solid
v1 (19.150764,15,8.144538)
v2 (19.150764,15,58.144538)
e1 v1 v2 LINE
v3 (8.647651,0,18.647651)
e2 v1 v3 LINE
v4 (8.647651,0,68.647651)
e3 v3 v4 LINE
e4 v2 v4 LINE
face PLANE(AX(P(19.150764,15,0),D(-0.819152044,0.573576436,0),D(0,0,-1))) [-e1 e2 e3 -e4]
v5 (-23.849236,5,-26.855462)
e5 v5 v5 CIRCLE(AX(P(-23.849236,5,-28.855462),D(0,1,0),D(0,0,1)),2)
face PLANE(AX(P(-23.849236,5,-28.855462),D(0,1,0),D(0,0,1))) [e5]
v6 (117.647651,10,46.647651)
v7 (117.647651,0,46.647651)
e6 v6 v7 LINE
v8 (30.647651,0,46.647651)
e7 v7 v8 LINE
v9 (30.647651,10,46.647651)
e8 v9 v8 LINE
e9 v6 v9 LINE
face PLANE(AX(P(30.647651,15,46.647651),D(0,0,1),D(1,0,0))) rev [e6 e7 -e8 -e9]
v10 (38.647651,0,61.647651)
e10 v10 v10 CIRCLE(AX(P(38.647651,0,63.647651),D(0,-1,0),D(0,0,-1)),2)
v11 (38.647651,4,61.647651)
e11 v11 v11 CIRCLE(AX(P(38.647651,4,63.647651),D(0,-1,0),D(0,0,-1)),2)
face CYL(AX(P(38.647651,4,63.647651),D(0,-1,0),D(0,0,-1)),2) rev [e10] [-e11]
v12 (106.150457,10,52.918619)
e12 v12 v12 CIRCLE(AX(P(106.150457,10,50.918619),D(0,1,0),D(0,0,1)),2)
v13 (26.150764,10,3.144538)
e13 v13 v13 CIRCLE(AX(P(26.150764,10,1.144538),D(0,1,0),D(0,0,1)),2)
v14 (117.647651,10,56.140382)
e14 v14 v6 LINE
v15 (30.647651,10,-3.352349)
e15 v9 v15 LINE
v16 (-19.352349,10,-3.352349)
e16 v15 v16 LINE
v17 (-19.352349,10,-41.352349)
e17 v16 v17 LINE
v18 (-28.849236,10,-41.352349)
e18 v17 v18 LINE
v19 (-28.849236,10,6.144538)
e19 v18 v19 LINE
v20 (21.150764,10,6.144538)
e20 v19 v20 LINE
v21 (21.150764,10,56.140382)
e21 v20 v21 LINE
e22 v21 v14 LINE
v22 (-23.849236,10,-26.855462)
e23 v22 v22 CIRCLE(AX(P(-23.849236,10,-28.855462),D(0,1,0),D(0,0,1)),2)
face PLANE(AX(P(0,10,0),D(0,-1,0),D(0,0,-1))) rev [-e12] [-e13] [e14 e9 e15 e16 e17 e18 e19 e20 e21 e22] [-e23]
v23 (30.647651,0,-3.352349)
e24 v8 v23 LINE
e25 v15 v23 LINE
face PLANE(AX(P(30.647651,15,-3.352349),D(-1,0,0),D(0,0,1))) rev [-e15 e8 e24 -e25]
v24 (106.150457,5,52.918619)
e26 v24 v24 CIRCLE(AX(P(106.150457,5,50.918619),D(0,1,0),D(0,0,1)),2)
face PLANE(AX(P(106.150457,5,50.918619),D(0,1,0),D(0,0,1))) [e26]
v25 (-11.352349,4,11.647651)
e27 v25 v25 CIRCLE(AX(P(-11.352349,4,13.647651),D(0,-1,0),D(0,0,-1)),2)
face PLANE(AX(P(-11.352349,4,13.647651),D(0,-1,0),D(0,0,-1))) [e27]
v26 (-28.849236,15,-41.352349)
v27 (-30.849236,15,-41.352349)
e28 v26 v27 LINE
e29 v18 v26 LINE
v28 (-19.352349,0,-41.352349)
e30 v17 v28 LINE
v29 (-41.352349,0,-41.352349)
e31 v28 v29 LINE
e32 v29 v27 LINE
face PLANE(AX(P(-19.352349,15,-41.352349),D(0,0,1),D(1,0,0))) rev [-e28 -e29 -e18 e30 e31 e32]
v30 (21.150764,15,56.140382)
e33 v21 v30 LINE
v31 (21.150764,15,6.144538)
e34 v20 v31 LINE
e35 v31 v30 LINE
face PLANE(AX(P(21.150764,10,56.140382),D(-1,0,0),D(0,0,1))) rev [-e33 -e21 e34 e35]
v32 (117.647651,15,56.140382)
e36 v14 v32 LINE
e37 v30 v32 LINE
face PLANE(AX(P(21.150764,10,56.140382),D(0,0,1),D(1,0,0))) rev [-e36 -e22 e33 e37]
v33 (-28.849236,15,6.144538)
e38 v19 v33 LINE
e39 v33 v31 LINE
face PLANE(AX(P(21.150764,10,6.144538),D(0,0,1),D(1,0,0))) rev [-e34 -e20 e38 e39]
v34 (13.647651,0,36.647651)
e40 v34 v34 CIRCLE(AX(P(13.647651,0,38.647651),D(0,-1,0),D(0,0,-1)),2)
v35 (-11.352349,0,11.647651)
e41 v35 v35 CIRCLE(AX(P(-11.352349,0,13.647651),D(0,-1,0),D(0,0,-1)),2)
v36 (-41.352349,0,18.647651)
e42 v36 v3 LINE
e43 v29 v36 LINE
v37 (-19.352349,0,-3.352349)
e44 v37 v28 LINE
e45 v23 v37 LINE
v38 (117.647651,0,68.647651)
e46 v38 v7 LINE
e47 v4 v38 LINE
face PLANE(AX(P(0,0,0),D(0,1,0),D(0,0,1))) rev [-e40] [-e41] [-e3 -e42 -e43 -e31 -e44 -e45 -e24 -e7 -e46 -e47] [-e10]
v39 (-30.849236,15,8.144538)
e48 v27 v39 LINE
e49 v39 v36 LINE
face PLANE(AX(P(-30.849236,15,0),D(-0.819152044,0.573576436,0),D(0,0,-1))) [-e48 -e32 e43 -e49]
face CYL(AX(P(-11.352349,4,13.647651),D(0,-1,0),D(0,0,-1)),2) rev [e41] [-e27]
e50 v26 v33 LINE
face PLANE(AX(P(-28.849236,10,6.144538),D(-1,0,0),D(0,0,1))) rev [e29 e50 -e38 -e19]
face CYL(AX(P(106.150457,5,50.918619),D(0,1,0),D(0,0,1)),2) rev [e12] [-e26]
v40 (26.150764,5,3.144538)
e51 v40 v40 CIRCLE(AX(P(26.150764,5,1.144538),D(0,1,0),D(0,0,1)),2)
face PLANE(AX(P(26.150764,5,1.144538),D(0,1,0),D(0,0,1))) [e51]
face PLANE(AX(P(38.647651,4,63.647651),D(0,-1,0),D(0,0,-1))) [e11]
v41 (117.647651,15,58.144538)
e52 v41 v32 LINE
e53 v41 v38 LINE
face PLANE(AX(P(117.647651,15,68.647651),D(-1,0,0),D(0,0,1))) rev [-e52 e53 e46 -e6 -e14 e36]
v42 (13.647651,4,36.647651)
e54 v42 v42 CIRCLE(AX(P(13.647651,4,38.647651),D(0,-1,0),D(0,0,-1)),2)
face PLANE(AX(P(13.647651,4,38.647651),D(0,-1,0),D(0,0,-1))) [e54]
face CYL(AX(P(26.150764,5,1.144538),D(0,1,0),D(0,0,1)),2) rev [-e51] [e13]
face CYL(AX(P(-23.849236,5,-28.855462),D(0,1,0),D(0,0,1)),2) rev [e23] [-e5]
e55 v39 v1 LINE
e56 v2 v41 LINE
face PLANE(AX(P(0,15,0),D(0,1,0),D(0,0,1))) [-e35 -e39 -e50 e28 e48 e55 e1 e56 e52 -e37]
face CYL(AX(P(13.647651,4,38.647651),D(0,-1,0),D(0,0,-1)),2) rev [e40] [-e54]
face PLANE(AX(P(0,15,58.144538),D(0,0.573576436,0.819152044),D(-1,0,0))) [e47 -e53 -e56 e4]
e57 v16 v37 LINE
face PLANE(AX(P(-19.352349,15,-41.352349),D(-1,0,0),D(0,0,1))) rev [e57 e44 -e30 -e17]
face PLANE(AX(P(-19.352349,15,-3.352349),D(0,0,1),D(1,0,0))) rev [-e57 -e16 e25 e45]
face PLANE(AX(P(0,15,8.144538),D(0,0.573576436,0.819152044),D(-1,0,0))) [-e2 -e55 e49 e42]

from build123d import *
from OCP.BRepFilletAPI import BRepFilletAPI_MakeChamfer

# Parameters (mm, degrees)
BOSS_EXTRU_1_DEPTH      = 15
CHANFREIN1_SIZE         = 10.503113073
CHANFREIN1_SIZE_2       = 15
ESQUISSE4_R             = 2
ENL_V_MAT_EXTRU_3_DEPTH = 4
ENL_V_MAT_EXTRU_5_DEPTH = 5
ESQUISSE6_R             = 2
ENL_V_MAT_EXTRU_6_DEPTH = 5


with BuildPart() as part:
    # Esquisse1 → Boss.-Extru.1 (new body)
    with BuildSketch(Plane(origin=(0, 0, 0), x_dir=(1, 0, 0), z_dir=(0, 1, 0))):
        Polygon((-41.352348911, -18.647651089), (8.647651089, -18.647651089), (8.647651089, -68.647651089), (68.647651089, -68.647651089), (117.647651089, -68.647651089), (117.647651089, -46.647651089), (68.647651089, -46.647651089), (30.647651089, -46.647651089), (30.647651089, 3.352348911), (-19.352348911, 3.352348911), (-19.352348911, 41.352348911), (-41.352348911, 41.352348911), align=None)
    extrude(amount=BOSS_EXTRU_1_DEPTH)

    # Chanfrein1
    chanfrein1_edges_1 = [part.edges().sort_by_distance(p)[0] for p in [
        (63.147651089, 15, 68.647651089),
    ]]
    chanfrein1_side_1 = [part.faces().sort_by_distance(p)[0] for p in [
        (63.147651089, 15, 68.437588827),
    ]]
    chanfrein1_edges_2 = [part.edges().sort_by_distance(p)[0] for p in [
        (8.647651089, 15, 43.647651089),
    ]]
    chanfrein1_side_2 = [part.faces().sort_by_distance(p)[0] for p in [
        (8.85771335, 15, 43.647651089),
    ]]
    chanfrein1_edges_3 = [part.edges().sort_by_distance(p)[0] for p in [
        (-16.352348911, 15, 18.647651089),
    ]]
    chanfrein1_side_3 = [part.faces().sort_by_distance(p)[0] for p in [
        (-16.352348911, 14.789937739, 18.647651089),
    ]]
    chanfrein1_edges_4 = [part.edges().sort_by_distance(p)[0] for p in [
        (-41.352348911, 15, -11.352348911),
    ]]
    chanfrein1_side_4 = [part.faces().sort_by_distance(p)[0] for p in [
        (-41.14228665, 15, -11.352348911),
    ]]
    chanfrein1 = BRepFilletAPI_MakeChamfer(part.part.solid().wrapped)
    for e in chanfrein1_edges_1:
        chanfrein1.Add(CHANFREIN1_SIZE - 0.0001, CHANFREIN1_SIZE_2 - 0.0001, e.wrapped, chanfrein1_side_1[0].wrapped)
    for e in chanfrein1_edges_2:
        chanfrein1.Add(CHANFREIN1_SIZE - 0.0001, CHANFREIN1_SIZE_2 - 0.0001, e.wrapped, chanfrein1_side_2[0].wrapped)
    for e in chanfrein1_edges_3:
        chanfrein1.Add(CHANFREIN1_SIZE_2 - 0.0001, CHANFREIN1_SIZE - 0.0001, e.wrapped, chanfrein1_side_3[0].wrapped)
    for e in chanfrein1_edges_4:
        chanfrein1.Add(CHANFREIN1_SIZE - 0.0001, CHANFREIN1_SIZE_2 - 0.0001, e.wrapped, chanfrein1_side_4[0].wrapped)
    add(Compound.cast(chanfrein1.Shape()), mode=Mode.REPLACE)  # a hair under: the kernel refuses the full size

    # Esquisse4 → Enlèv. mat.-Extru.3 (cut)
    with BuildSketch(Plane.XZ):
        with Locations(Location((38.647651089, 63.647651089, 0), (0, 0, 270))):
            Circle(ESQUISSE4_R)
        with Locations(Location((13.647651089, 38.647651089, 0), (0, 0, 270))):
            Circle(ESQUISSE4_R)
        with Locations(Location((-11.352348911, 13.647651089, 0), (0, 0, 270))):
            Circle(ESQUISSE4_R)
    extrude(amount=-ENL_V_MAT_EXTRU_3_DEPTH, mode=Mode.SUBTRACT)

    # Esquisse5 → Enlèv. mat.-Extru.5 (cut)
    with BuildSketch(Plane(origin=(0, 15, 0), x_dir=(1, 0, 0), z_dir=(0, 1, 0))):
        Polygon((-28.849235838, 41.352348911), (-19.352348911, 41.352348911), (-19.352348911, 3.352348911), (30.647651089, 3.352348911), (30.647651089, -46.647651089), (117.647651089, -46.647651089), (117.647651089, -56.140382231), (21.150764162, -56.140382231), (21.150764162, -6.144538016), (-28.849235838, -6.144538016), align=None)
    extrude(amount=-ENL_V_MAT_EXTRU_5_DEPTH, mode=Mode.SUBTRACT)

    # Esquisse6 → Enlèv. mat.-Extru.6 (cut)
    with BuildSketch(Plane(origin=(0, 10, 0), x_dir=(1, 0, 0), z_dir=(0, 1, 0))):
        with Locations(Location((-23.849235838, 28.855461984, 0), (0, 0, 270))):
            Circle(ESQUISSE6_R)
        with Locations(Location((26.150764162, -1.144538016, 0), (0, 0, 270))):
            Circle(ESQUISSE6_R)
        with Locations(Location((106.150456792, -50.918618661, 0), (0, 0, 270))):
            Circle(ESQUISSE6_R)
    extrude(amount=-ENL_V_MAT_EXTRU_6_DEPTH, mode=Mode.SUBTRACT)


solid = part.part
